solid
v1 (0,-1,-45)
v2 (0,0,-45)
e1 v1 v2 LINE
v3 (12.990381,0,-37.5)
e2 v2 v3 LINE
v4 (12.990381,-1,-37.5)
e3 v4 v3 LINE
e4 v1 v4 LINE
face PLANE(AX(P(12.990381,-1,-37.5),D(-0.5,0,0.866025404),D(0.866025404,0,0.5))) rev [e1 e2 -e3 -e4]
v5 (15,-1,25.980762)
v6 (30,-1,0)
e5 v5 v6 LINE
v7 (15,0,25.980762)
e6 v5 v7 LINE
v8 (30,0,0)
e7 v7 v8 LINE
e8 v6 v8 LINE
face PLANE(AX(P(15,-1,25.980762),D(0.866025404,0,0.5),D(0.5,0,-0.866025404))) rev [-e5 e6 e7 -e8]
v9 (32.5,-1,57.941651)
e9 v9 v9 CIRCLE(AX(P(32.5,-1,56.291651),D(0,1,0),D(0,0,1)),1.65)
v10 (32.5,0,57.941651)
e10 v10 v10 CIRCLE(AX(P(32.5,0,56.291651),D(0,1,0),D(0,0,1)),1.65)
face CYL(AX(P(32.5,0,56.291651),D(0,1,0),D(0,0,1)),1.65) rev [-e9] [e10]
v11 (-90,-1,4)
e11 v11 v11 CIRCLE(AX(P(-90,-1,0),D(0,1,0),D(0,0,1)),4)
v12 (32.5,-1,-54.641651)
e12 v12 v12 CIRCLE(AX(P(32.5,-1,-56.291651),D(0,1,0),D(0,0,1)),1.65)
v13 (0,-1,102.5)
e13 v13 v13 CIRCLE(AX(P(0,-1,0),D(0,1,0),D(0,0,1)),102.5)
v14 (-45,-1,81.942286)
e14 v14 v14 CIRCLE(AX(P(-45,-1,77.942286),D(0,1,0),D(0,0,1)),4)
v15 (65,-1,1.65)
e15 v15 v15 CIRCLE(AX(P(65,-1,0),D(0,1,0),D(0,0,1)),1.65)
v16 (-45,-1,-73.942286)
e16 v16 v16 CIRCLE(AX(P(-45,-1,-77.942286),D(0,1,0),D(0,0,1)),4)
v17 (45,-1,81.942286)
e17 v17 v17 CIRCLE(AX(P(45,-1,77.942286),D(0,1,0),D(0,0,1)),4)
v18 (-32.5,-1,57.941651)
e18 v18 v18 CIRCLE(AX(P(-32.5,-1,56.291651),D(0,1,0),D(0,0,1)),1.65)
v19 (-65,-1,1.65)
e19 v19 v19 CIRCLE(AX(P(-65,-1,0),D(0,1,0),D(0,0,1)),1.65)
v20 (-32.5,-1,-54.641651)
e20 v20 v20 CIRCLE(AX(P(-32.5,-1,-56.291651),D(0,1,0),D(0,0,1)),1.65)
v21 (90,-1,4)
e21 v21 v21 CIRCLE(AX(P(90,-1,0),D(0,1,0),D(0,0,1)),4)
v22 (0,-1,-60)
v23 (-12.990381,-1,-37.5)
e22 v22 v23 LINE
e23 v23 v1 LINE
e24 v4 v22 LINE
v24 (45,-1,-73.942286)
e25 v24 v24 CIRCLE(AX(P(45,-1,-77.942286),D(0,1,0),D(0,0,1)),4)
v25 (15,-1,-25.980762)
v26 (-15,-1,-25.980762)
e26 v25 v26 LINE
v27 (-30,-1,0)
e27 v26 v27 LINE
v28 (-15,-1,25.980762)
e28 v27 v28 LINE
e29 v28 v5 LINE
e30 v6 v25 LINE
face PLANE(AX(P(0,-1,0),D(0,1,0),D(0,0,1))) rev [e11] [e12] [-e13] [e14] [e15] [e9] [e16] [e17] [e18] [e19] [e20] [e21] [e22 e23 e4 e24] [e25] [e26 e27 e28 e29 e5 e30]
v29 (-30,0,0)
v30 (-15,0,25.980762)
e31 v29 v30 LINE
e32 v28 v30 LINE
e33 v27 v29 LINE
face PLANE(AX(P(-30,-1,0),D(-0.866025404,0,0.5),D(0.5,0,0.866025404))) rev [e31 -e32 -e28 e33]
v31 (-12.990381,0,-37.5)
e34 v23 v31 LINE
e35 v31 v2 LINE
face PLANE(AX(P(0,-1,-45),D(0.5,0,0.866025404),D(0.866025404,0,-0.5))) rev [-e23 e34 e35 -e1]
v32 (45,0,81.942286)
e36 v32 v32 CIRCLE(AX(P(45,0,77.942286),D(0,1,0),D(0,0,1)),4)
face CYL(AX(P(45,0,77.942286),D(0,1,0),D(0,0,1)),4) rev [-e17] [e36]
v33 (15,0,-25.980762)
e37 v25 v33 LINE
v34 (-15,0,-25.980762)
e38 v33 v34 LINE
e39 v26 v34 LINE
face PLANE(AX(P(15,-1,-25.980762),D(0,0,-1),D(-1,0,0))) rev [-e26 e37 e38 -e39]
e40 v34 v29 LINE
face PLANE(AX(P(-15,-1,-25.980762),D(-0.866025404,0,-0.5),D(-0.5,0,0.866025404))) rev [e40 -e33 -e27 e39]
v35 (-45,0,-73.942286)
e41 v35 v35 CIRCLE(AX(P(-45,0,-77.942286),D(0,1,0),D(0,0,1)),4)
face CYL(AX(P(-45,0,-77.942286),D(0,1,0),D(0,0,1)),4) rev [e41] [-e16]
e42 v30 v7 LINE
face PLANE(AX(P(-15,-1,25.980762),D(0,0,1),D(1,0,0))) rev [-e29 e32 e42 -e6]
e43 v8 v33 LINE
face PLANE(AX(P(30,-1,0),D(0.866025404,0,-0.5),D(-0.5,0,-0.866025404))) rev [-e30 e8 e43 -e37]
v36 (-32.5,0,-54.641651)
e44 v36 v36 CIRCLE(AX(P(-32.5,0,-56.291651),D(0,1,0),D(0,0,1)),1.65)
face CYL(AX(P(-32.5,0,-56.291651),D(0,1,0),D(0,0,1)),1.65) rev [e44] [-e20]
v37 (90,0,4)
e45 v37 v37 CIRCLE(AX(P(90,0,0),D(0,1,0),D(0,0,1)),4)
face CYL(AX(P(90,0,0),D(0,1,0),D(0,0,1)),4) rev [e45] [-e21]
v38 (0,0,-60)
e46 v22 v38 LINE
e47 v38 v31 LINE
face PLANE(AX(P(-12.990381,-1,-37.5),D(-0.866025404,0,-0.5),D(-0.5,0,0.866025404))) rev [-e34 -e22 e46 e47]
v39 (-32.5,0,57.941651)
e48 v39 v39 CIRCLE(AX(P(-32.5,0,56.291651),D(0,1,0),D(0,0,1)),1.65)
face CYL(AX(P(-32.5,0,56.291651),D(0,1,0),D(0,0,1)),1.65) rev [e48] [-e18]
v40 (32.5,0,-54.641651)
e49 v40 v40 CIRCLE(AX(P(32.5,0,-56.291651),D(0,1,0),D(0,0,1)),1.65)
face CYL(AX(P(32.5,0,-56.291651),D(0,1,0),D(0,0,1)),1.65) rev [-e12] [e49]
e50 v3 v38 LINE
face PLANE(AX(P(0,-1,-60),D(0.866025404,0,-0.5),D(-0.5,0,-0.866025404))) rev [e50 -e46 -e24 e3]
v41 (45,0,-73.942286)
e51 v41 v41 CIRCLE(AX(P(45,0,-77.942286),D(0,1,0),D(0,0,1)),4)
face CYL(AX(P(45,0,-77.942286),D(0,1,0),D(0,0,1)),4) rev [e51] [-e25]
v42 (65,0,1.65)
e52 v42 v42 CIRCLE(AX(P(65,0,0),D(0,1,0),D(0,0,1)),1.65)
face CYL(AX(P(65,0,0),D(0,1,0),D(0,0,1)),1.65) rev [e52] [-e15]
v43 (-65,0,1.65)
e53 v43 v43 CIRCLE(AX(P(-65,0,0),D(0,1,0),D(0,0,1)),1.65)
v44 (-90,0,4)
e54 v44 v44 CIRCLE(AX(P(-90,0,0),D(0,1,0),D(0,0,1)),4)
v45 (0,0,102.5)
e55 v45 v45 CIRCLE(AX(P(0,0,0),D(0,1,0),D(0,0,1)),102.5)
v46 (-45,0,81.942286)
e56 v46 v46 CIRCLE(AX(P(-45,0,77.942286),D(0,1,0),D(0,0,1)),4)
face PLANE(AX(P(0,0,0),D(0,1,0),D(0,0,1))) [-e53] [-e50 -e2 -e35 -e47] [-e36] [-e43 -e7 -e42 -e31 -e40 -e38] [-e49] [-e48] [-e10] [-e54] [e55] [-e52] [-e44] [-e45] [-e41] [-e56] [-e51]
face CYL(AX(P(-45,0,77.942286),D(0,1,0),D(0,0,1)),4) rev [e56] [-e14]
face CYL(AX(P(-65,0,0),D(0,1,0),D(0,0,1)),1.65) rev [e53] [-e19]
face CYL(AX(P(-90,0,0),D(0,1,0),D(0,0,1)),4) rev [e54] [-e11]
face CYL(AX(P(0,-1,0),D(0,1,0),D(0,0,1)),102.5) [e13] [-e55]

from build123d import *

# Parameters (mm, degrees)
SKETCH_1_R               = 102.5
SM_BASE_FLANGE_1_DEPTH   = 1
HOLE_WIZARD_8_0_8_1_D    = 8
PATTERN_CIRCULAR_1_COUNT = 6
HOLE_WIZARD_3_3_3_3_1_D  = 3.3


# Sheet-metal steps are written as plain solids
with BuildPart() as part:
    # Sketch 1 → 基体-法兰1 (new body)
    with BuildSketch(Plane(origin=(0, 0, 0), x_dir=(1, 0, 0), z_dir=(0, 1, 0))):
        with Locations(Location((0, 0, 0), (0, 0, 270))):
            Circle(SKETCH_1_R)
        Polygon((-12.990381057, 37.5), (0, 60), (12.990381057, 37.5), (0, 45), align=None, mode=Mode.SUBTRACT)
        Polygon((30, 0), (15, 25.980762114), (-15, 25.980762114), (-30, 0), (-15, -25.980762114), (15, -25.980762114), align=None, mode=Mode.SUBTRACT)
    extrude(amount=-SM_BASE_FLANGE_1_DEPTH)

    # Ø8.0 (8) 直径孔1 (through all)
    with Locations(Plane(origin=(0, 0, 0), x_dir=(1, 0, 0), z_dir=(0, 1, 0))):
        with Locations((-90, 0)):
            hole_wizard_8_0_8_1 = Hole(HOLE_WIZARD_8_0_8_1_D / 2)

    # 阵列(圆周)1: Ø8.0 (8) 直径孔1 ×6 about axis
    pattern_circular_1_axis = Axis((0, 0, 0), (0, 1, 0))
    for i in range(1, PATTERN_CIRCULAR_1_COUNT):
        add(hole_wizard_8_0_8_1.rotate(pattern_circular_1_axis, i * 360 / PATTERN_CIRCULAR_1_COUNT), mode=Mode.SUBTRACT)

    # Ø3.3 (3.3) 直径孔1 (through all)
    with Locations(Plane(origin=(0, 0, 0), x_dir=(1, 0, 0), z_dir=(0, 1, 0))):
        with Locations((32.5, -56.291651246), (65, 0), (32.5, 56.291651246), (-32.5, 56.291651246), (-65, 0), (-32.5, -56.291651246)):
            Hole(HOLE_WIZARD_3_3_3_3_1_D / 2)


solid = part.part
